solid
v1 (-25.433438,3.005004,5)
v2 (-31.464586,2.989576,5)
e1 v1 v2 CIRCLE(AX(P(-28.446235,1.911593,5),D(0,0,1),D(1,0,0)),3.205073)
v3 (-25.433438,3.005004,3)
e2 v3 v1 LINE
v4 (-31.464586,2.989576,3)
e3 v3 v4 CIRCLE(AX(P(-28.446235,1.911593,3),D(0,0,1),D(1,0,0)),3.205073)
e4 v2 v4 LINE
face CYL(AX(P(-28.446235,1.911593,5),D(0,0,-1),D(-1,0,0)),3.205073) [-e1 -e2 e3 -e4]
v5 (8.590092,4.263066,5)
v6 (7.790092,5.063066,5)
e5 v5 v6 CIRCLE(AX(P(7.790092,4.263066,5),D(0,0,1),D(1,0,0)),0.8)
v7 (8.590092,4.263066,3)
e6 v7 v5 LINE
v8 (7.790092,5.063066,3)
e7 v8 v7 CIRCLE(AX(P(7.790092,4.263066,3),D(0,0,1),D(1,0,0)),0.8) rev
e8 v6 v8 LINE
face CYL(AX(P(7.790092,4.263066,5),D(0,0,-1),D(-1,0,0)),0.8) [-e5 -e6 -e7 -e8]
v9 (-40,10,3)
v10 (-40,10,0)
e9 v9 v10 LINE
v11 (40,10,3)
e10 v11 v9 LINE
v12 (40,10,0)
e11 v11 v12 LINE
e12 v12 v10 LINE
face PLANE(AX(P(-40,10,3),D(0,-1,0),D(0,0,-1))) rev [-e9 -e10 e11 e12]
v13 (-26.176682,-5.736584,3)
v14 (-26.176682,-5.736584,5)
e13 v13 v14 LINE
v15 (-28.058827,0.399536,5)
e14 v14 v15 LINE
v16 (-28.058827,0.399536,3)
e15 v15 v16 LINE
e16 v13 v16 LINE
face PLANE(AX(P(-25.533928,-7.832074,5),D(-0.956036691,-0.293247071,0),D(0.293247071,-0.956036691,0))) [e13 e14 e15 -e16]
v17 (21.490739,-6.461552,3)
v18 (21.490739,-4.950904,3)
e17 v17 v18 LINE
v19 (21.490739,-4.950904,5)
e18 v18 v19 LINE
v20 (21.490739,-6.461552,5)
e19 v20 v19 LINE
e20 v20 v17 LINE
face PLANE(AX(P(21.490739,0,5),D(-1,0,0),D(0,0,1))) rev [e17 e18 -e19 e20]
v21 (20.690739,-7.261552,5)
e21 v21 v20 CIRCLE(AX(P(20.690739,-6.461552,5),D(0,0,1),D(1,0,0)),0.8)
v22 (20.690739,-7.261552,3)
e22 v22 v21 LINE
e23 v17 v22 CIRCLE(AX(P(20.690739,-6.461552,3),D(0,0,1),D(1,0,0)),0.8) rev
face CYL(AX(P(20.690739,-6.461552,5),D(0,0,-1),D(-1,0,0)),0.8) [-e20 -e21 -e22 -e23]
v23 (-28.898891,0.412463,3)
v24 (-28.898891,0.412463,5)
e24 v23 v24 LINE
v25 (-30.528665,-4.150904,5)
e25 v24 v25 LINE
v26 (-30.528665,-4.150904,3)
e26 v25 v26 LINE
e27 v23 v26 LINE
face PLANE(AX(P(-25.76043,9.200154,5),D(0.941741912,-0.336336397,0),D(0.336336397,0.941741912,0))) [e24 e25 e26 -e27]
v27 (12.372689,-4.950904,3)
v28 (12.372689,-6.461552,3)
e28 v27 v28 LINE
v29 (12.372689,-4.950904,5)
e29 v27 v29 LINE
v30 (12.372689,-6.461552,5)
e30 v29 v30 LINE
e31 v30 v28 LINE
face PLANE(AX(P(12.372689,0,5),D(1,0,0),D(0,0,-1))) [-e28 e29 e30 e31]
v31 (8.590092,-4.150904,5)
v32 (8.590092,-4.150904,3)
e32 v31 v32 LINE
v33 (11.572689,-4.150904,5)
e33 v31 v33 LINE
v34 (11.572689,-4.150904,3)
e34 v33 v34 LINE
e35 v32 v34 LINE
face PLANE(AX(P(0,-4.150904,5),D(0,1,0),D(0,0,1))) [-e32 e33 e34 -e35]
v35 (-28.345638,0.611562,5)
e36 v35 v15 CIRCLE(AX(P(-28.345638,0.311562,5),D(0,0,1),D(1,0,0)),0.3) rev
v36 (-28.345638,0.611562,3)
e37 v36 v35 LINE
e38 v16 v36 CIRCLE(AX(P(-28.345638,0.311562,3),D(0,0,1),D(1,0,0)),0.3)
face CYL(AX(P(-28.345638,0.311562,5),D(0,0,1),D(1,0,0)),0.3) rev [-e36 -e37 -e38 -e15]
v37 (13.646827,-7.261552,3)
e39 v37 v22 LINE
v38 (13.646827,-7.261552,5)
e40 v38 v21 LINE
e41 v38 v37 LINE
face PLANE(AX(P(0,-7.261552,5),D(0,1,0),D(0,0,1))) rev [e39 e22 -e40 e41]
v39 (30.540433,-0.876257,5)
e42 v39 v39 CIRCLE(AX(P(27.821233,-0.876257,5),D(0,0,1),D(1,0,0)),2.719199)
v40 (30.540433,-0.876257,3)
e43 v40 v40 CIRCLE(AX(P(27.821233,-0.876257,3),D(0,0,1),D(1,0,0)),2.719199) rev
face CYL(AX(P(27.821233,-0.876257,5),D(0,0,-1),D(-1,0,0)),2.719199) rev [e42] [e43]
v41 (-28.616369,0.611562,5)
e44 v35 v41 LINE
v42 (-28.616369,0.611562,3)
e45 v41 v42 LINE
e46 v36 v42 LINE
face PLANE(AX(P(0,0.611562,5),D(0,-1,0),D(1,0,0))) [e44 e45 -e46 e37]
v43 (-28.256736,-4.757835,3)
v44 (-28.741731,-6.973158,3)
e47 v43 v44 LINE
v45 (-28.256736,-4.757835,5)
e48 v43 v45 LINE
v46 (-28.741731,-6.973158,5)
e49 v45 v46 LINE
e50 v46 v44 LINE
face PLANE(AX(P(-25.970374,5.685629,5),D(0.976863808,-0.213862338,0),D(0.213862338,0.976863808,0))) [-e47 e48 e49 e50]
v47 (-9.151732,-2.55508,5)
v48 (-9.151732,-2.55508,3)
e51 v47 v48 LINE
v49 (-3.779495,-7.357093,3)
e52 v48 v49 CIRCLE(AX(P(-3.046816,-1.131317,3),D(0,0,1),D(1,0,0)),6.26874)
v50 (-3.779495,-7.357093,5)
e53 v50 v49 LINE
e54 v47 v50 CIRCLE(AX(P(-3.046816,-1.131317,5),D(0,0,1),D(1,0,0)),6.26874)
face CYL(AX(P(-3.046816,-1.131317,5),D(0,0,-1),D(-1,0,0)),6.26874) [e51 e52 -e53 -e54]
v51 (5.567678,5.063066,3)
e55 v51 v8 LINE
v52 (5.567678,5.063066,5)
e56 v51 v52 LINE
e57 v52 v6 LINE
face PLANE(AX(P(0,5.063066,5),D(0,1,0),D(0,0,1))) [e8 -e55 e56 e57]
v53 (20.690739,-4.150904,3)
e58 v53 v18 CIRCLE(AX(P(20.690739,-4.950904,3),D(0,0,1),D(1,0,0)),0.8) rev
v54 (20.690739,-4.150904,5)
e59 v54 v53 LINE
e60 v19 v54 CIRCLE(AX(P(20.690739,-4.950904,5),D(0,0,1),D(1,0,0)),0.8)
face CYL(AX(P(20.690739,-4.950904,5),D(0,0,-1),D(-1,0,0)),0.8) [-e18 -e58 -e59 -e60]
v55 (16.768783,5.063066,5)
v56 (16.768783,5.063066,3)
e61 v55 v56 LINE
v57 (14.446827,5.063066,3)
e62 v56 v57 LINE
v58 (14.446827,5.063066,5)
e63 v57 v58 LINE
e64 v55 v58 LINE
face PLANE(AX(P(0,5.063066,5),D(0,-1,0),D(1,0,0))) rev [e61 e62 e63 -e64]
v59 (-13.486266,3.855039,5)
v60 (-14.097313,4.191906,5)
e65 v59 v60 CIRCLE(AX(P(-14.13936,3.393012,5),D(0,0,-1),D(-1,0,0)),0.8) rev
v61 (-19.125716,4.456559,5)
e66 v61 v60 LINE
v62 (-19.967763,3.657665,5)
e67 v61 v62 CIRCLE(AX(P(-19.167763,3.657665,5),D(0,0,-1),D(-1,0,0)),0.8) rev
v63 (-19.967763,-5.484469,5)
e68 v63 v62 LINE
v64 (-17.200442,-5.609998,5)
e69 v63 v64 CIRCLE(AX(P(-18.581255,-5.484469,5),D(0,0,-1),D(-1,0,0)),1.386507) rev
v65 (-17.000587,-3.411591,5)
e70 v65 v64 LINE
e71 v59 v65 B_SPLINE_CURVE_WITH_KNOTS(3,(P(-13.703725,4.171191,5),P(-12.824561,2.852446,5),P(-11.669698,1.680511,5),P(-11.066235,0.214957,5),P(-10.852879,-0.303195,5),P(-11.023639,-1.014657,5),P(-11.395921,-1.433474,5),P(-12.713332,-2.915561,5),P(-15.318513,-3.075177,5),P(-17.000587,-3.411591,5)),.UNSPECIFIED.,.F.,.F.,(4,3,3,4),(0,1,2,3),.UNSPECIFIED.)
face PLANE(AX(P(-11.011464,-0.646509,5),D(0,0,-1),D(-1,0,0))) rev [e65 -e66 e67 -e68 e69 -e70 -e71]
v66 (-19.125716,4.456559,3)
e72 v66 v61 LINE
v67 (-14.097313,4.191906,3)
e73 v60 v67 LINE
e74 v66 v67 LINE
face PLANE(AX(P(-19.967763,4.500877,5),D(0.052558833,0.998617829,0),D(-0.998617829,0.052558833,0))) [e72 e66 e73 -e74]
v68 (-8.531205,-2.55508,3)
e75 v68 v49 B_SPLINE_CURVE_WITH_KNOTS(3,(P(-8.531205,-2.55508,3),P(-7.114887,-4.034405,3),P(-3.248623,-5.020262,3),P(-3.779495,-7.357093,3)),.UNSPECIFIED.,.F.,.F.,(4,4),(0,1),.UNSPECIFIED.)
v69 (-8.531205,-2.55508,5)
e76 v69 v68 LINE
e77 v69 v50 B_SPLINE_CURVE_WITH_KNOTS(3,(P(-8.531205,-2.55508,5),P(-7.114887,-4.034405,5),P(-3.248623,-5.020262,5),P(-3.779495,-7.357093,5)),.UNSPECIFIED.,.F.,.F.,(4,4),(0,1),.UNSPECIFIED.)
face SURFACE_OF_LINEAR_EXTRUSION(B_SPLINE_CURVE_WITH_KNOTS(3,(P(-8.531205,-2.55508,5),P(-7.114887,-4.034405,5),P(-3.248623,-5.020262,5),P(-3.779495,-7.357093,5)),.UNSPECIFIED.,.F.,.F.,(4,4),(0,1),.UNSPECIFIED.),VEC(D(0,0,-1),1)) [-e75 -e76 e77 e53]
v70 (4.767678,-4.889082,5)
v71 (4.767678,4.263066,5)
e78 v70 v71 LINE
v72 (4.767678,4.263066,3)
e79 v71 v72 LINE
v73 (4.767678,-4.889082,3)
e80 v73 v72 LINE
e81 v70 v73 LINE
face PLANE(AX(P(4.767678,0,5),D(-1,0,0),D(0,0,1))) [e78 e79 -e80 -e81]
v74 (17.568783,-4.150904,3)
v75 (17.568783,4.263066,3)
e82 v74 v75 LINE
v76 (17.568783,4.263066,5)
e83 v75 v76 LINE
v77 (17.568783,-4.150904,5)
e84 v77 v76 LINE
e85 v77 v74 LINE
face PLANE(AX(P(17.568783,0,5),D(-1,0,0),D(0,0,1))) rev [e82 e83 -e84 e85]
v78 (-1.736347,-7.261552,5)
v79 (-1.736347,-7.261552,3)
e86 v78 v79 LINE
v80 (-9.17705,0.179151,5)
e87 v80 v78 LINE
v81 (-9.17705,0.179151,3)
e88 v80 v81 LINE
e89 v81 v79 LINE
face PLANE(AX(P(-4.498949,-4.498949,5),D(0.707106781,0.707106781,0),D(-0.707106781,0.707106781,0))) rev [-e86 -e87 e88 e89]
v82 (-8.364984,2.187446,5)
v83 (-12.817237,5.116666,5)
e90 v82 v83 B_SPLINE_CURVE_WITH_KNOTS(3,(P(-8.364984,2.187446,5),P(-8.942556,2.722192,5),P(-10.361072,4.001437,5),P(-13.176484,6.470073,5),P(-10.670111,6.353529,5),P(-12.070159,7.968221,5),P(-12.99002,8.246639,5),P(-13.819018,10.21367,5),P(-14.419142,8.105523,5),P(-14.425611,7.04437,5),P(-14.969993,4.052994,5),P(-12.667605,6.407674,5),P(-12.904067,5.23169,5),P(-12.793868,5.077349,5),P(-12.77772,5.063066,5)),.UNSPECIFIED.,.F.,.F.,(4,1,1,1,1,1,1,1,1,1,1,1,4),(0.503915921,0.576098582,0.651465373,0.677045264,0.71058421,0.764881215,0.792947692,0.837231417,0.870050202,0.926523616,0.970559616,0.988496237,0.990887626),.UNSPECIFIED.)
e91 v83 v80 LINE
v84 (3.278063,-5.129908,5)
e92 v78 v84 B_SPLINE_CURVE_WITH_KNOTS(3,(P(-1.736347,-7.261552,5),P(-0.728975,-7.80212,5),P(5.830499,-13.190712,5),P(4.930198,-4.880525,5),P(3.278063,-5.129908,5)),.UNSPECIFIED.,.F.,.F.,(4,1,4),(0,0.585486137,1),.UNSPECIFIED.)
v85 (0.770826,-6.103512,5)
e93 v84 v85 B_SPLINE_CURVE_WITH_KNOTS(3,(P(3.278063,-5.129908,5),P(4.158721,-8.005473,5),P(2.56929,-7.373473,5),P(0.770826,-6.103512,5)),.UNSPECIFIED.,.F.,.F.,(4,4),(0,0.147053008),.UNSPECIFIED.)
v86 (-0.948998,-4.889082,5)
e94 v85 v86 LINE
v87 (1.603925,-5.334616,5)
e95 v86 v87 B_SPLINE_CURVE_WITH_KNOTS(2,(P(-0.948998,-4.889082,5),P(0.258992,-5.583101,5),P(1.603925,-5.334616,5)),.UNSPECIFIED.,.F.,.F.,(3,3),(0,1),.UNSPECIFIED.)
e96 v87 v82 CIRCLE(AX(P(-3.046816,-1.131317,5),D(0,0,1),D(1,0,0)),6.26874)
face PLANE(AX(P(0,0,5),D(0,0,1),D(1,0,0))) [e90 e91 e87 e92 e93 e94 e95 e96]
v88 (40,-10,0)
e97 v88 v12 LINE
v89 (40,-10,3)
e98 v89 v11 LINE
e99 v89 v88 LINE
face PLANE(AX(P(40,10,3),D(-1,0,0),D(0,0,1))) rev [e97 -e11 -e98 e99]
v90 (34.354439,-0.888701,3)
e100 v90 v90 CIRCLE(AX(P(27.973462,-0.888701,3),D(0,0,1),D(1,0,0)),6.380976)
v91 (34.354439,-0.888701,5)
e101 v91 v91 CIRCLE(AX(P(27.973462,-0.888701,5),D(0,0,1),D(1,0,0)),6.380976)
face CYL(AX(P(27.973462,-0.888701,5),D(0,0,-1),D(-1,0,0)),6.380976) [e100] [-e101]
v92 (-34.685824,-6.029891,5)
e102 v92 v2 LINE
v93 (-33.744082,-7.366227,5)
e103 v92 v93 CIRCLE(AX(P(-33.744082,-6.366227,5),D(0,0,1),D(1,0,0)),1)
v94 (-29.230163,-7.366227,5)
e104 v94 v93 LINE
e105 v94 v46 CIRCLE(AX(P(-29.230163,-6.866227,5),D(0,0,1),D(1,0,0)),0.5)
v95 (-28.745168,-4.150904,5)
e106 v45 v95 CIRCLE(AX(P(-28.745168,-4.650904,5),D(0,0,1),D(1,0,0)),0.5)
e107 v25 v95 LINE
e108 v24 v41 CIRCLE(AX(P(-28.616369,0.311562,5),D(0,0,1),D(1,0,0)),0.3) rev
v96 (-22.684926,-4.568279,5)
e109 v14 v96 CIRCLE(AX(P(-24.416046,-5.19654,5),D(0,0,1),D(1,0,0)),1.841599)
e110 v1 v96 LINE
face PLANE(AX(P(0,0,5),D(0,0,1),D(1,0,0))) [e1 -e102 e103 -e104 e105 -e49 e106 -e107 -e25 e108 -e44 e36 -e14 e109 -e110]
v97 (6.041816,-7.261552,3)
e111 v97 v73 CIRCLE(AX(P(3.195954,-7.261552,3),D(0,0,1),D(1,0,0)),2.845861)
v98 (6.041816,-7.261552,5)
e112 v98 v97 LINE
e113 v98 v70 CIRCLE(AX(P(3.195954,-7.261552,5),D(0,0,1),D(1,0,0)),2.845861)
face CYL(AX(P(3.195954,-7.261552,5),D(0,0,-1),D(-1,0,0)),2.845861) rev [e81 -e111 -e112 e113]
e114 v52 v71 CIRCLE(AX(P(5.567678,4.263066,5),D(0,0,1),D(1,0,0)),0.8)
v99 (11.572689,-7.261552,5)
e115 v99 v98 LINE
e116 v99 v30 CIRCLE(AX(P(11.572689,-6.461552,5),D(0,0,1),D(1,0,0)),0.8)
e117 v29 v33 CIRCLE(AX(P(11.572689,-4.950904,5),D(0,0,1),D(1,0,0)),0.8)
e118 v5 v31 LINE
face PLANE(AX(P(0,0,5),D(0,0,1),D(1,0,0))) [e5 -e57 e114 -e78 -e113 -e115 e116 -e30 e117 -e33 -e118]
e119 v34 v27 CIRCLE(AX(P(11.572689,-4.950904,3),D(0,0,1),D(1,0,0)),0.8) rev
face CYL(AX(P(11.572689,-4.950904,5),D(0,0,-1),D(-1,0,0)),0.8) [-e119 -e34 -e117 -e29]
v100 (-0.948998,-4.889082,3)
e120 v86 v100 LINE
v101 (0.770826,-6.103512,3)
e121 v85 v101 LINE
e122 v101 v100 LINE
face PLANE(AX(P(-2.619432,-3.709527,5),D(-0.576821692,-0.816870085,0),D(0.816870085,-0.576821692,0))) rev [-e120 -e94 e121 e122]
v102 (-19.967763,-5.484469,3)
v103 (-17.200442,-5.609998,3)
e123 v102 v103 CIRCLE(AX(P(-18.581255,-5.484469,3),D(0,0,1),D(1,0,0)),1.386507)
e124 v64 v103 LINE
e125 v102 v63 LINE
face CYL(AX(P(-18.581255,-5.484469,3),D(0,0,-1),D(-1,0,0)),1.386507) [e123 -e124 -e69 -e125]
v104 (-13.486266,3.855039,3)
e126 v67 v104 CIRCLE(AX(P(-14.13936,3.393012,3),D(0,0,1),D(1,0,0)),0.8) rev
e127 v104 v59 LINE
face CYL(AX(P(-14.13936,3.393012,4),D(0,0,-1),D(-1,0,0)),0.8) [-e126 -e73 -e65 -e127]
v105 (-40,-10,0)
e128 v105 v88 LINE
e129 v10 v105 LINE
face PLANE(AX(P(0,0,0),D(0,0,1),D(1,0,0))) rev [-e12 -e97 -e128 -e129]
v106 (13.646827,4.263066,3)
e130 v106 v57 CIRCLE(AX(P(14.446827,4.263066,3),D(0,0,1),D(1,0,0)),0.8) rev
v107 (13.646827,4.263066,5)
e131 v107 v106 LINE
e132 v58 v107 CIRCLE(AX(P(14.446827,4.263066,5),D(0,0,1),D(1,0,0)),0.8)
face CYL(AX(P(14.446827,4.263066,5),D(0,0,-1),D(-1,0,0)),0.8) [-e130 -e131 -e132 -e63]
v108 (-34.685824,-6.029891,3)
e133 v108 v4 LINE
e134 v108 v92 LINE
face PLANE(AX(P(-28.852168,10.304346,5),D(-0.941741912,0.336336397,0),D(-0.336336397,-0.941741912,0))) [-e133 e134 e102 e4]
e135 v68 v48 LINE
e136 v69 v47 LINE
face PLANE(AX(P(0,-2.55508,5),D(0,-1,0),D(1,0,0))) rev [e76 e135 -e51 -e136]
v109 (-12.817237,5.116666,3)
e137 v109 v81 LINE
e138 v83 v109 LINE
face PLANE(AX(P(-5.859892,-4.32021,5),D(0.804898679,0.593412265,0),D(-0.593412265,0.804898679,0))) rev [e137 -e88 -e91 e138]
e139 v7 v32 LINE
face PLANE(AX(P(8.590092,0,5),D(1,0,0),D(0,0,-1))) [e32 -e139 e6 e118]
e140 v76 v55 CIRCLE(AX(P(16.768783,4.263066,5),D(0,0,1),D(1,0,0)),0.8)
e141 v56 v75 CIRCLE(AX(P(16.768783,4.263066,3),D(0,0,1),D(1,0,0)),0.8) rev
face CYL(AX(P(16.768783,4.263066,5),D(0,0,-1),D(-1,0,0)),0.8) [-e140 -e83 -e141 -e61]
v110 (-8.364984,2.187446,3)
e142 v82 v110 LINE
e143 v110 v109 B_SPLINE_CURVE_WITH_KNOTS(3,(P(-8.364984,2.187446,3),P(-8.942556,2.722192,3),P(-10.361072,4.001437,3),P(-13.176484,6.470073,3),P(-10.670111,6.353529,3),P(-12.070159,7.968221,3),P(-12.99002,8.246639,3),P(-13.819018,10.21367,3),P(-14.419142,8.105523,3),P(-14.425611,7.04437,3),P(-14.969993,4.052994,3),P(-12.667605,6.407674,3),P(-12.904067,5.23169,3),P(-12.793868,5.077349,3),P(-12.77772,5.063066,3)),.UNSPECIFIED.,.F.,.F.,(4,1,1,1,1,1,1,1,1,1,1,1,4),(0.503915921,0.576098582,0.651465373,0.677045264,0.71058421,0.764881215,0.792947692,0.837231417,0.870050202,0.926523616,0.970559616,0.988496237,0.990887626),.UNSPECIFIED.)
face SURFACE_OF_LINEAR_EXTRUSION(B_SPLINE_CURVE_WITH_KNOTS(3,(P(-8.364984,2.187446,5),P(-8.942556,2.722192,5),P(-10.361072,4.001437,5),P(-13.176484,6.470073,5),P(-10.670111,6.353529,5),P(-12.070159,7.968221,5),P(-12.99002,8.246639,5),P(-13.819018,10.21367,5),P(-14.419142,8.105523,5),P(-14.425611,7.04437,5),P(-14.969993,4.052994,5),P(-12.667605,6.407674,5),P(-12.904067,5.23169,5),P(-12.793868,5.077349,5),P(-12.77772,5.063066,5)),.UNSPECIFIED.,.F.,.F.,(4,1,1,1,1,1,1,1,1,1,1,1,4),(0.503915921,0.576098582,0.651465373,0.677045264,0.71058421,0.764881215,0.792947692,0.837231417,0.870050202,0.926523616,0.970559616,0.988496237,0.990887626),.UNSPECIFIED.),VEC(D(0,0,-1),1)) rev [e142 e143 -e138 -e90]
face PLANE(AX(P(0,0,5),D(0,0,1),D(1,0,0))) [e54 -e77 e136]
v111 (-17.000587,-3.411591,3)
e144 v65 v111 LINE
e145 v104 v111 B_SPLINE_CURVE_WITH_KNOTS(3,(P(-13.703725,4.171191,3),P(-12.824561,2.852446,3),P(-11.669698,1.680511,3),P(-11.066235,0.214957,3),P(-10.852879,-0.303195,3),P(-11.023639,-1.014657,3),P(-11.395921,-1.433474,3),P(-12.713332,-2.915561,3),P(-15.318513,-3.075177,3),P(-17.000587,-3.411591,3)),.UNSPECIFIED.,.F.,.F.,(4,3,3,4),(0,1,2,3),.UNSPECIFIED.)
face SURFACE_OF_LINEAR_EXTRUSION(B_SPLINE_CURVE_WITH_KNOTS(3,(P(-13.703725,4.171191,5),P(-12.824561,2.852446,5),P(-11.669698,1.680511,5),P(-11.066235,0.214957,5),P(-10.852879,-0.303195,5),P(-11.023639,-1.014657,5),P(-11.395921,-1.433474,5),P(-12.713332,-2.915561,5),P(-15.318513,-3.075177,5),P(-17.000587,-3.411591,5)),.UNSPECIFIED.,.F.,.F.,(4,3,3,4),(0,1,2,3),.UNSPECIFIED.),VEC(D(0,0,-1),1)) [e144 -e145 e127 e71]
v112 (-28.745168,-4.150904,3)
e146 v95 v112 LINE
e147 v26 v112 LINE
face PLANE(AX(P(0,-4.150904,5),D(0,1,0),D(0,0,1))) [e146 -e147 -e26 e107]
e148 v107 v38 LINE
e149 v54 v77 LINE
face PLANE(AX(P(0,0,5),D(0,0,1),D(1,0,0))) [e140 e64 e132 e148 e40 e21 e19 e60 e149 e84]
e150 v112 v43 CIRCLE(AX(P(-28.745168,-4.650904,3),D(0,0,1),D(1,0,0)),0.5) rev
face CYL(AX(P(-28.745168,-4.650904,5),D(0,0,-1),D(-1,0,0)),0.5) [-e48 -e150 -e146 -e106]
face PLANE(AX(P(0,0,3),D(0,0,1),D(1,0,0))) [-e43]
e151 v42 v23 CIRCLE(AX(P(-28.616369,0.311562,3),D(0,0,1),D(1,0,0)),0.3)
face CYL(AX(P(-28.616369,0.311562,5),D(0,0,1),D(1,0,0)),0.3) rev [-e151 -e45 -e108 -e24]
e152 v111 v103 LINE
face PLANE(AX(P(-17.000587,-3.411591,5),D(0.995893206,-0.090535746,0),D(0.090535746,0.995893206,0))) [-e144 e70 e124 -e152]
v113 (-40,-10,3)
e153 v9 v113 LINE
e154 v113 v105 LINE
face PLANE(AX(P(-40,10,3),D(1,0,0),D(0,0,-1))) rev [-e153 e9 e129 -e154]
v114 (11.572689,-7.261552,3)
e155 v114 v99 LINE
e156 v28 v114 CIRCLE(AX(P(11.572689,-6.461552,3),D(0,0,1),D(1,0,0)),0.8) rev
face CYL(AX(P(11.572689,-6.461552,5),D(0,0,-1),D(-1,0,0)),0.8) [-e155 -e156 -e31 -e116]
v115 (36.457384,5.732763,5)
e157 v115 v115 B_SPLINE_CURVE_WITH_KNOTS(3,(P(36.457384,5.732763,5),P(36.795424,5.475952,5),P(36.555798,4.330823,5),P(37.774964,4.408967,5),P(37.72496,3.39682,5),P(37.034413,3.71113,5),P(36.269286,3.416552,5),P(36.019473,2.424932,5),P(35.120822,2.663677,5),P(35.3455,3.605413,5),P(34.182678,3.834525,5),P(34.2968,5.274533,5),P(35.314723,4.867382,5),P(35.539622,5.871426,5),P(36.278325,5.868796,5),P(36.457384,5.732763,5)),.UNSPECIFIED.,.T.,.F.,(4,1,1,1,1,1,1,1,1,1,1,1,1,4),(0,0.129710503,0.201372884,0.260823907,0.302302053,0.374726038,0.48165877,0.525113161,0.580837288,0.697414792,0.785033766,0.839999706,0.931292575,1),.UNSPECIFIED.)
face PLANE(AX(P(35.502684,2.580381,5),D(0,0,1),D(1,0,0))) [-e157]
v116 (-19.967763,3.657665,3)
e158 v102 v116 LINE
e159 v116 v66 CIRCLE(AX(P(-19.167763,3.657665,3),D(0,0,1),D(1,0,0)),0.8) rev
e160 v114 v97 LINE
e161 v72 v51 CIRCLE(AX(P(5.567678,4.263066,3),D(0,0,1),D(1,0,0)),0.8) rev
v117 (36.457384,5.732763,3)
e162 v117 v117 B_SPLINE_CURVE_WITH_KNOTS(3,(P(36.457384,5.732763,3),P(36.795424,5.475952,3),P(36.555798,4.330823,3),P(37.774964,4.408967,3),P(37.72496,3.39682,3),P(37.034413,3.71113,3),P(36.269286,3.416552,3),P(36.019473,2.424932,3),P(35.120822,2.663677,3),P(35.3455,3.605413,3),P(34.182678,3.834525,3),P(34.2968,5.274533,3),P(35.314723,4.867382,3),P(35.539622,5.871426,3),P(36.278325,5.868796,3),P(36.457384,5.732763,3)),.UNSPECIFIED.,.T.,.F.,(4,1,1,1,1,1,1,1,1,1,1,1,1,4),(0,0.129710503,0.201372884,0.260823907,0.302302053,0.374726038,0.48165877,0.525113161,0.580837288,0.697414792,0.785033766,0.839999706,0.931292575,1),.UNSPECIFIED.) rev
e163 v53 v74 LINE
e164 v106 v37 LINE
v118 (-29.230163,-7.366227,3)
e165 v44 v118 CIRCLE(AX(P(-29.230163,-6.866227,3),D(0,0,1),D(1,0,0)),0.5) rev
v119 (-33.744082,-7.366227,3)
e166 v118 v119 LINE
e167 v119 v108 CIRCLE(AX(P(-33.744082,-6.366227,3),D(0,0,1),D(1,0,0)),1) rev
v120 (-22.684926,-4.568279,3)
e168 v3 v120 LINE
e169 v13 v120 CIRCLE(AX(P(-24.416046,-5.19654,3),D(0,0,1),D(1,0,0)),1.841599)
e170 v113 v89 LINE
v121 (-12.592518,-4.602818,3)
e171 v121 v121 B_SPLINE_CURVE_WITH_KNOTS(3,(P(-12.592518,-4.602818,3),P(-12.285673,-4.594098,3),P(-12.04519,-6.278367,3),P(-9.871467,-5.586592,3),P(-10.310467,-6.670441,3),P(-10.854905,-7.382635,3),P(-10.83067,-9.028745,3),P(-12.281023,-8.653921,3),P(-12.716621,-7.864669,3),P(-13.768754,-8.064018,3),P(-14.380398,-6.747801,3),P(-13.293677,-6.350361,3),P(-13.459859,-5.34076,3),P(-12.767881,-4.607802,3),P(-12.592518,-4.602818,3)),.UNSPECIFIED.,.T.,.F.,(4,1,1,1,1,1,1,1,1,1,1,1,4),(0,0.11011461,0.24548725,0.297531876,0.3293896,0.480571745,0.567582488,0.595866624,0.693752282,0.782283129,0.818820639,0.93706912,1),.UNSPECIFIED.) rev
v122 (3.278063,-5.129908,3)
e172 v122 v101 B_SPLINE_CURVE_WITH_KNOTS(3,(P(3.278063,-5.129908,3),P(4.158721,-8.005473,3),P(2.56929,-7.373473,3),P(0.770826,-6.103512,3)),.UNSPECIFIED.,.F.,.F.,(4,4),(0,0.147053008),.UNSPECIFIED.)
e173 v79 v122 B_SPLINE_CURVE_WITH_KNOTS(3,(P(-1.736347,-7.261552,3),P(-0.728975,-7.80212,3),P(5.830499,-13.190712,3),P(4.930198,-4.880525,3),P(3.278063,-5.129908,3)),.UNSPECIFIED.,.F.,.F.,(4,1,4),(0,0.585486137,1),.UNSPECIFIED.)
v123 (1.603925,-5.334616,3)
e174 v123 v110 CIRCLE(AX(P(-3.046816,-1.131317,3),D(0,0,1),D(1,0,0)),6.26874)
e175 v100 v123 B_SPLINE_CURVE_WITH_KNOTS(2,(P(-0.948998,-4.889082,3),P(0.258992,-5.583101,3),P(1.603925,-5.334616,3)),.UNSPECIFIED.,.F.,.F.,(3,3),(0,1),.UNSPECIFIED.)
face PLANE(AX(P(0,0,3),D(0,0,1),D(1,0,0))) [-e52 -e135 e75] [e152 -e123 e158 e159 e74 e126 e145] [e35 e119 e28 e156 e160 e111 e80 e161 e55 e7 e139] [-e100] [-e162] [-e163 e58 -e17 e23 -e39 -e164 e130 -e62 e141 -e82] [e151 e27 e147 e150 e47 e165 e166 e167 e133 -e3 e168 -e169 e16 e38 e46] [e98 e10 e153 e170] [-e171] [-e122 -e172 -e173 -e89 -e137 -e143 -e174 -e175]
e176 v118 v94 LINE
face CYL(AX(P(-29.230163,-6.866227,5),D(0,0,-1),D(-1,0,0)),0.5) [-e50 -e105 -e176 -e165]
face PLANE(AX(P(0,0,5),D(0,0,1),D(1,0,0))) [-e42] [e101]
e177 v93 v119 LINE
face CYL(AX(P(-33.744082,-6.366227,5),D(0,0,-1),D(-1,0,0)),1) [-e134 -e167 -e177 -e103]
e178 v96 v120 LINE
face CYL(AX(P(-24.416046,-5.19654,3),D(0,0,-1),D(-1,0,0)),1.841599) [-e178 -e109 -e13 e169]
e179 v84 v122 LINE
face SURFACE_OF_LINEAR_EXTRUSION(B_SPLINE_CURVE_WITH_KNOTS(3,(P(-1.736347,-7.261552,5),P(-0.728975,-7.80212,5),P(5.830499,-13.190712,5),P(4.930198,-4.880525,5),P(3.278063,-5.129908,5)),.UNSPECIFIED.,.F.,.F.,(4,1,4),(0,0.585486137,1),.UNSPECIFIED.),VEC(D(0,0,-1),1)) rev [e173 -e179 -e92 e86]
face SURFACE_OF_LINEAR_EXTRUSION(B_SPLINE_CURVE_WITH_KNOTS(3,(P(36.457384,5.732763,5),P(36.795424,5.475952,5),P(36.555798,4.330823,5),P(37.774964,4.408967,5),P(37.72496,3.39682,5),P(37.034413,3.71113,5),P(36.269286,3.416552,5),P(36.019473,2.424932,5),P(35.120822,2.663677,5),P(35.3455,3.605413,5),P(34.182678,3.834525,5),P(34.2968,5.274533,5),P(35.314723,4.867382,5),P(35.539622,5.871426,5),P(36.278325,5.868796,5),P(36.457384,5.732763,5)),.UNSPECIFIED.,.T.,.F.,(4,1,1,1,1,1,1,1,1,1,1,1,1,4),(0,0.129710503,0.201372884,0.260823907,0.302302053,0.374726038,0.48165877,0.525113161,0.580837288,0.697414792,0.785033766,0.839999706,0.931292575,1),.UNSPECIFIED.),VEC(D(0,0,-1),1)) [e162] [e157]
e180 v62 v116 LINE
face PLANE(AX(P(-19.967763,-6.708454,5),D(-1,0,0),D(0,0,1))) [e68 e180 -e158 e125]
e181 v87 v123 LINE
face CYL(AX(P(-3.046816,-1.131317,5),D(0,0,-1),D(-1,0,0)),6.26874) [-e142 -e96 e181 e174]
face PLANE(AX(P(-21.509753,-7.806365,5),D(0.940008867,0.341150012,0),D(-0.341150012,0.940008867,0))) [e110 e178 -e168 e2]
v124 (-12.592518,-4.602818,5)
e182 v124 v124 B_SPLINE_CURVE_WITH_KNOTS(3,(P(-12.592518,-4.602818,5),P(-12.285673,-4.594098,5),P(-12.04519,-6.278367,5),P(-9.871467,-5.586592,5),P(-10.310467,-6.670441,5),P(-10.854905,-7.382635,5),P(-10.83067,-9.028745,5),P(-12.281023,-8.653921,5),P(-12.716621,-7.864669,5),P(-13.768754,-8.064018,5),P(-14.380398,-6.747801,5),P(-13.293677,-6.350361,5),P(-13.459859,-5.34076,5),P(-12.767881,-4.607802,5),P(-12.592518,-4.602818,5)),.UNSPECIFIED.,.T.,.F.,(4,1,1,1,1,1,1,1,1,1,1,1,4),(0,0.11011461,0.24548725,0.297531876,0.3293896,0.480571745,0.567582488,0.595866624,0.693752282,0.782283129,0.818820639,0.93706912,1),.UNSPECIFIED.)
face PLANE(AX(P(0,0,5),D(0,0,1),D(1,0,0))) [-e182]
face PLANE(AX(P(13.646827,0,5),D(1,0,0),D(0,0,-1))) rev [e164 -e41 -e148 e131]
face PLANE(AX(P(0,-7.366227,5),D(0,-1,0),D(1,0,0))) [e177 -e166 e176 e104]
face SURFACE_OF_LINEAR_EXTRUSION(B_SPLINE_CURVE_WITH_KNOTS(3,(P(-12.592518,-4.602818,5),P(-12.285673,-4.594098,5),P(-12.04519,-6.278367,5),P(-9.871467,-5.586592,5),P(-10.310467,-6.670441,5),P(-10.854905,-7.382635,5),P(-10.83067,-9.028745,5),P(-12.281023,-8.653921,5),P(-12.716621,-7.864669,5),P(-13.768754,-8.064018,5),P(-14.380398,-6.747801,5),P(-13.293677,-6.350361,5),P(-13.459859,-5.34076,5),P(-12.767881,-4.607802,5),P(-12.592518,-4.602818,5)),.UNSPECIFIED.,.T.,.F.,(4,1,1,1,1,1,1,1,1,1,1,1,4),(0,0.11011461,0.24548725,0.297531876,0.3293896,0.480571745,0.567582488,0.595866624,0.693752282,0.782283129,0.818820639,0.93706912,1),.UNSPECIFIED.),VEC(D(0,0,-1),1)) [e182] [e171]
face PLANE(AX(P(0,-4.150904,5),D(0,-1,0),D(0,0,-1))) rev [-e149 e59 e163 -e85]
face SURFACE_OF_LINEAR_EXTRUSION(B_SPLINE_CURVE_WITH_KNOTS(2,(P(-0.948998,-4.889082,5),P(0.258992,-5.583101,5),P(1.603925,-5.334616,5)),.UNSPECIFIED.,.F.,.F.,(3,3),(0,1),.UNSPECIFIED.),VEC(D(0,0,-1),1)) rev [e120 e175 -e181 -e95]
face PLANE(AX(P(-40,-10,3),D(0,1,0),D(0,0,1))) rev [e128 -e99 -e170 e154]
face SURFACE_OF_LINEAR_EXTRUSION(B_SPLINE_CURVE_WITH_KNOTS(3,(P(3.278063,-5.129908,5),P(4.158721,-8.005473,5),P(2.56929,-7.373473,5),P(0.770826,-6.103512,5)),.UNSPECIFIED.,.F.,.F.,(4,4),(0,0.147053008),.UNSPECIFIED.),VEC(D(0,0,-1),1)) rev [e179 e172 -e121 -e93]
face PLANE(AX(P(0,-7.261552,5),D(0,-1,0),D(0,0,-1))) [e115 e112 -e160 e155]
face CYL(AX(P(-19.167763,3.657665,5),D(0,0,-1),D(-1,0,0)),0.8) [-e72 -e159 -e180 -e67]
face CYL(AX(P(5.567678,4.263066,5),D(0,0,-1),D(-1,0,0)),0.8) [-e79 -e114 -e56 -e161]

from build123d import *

# Parameters (mm, degrees)
SKETCH1_W           = 80
SKETCH1_H           = 20
BOSS_EXTRUDE1_DEPTH = 3
SKETCH2_R           = 6.380976216
SKETCH2_R_2         = 2.719199248
BOSS_EXTRUDE2_DEPTH = 2
FILLET2_R           = 3.205073
FILLET3_R           = 1
FILLET4_R           = 0.5
FILLET5_R           = 0.3
FILLET6_R           = 1.841599
FILLET7_R           = 1.386507
FILLET8_R           = 0.8
FILLET9_R           = 0.8


with BuildPart() as part:
    # Sketch1 → Boss-Extrude1 (new body)
    with BuildSketch(Plane.XY):
        Rectangle(SKETCH1_W, SKETCH1_H)
    extrude(amount=BOSS_EXTRUDE1_DEPTH)

    # Sketch2 → Boss-Extrude2 (add)
    # profile 1 of 9: a face of its own
    with BuildSketch(Plane.XY.offset(3)):
        Polygon((-28.12386187, -4.1509041), (-28.827784411, -7.366226909), (-35.163087278, -7.366226909), (-30.704911186, 5.116666146), (-26.199806926, 5.116666146), (-21.788559004, -7.03813971), (-25.777453401, -7.03813971), (-28.12386187, 0.611561886), (-28.827784411, 0.611561886), (-30.52866512, -4.1509041), align=None)
    # profile 2 of 9: a face of its own
    with BuildSketch(Plane.XY.offset(3)):
        with BuildLine():
            add(Edge.make_bspline(
                [(-12.59251829, -4.602818179), (-12.285673118, -4.594098223), (-12.045189517, -6.278366622), (-9.871466908, -5.586592295), (-10.310467369, -6.670441484), (-10.854905139, -7.382635244), (-10.830670227, -9.028744868), (-12.281022713, -8.653920913), (-12.716621389, -7.864668819), (-13.768754433, -8.064018209), (-14.380398238, -6.747801361), (-13.293676747, -6.35036102), (-13.459858592, -5.340760333), (-12.767881366, -4.607801664), (-12.59251829, -4.602818179)],
                knots=[0, 0, 0, 0, 0.11011461, 0.24548725, 0.297531876, 0.3293896, 0.480571745, 0.567582488, 0.595866624, 0.693752282, 0.782283129, 0.818820639, 0.93706912, 1, 1, 1, 1], degree=3))
        make_face()
    # profile 3 of 9: a face of its own
    with BuildSketch(Plane.XY.offset(3)):
        with BuildLine():
            add(Edge.make_bspline(
                [(-8.364983843, 2.187446392), (-8.942555715, 2.722192331), (-10.361072154, 4.001436937), (-13.176484219, 6.470073101), (-10.670110511, 6.353529328), (-12.070158555, 7.96822111), (-12.990019942, 8.246638508), (-13.819017978, 10.213670234), (-14.41914197, 8.105522509), (-14.425611396, 7.044369894), (-14.969993178, 4.05299408), (-12.667604996, 6.407674494), (-12.895281858, 5.275383081), (-12.817237262, 5.116666146)],
                knots=[0.503915921, 0.503915921, 0.503915921, 0.503915921, 0.576098582, 0.651465373, 0.677045264, 0.71058421, 0.764881215, 0.792947692, 0.837231417, 0.870050202, 0.926523616, 0.970559616, 0.988496237, 0.988496237, 0.988496237, 0.988496237], degree=3))
            Line((-12.817237262, 5.116666146), (-12.777720238, 5.063065635))
            Line((-12.777720238, 5.063065635), (-9.177050203, 0.179151487))
            Line((-9.177050203, 0.179151487), (-1.736347016, -7.261551699))
            add(Edge.make_bspline(
                [(-1.736347016, -7.261551699), (-0.728975006, -7.80212022), (5.830498878, -13.19071187), (4.93019751, -4.880525107), (3.278062555, -5.129908048)],
                knots=[0, 0, 0, 0, 0.585486137, 1, 1, 1, 1], degree=3))
            add(Edge.make_bspline(
                [(3.278062555, -5.129908048), (4.158720522, -8.005473341), (2.569289754, -7.373472742), (0.770825638, -6.103511786)],
                knots=[0, 0, 0, 0, 0.147053008, 0.147053008, 0.147053008, 0.147053008], degree=3))
            Line((0.770825638, -6.103511786), (-0.948997568, -4.889082039))
            add(Edge.make_bspline(
                [(-0.948997568, -4.889082039), (0.258992445, -5.583100773), (1.603924753, -5.334615685)],
                knots=[0, 0, 0, 1, 1, 1], degree=2))
            ThreePointArc((1.603924753, -5.334615685), (0.728991597, 3.872719866), (-8.364983843, 2.187446392))
        make_face()
    # profile 4 of 9: a face of its own
    with BuildSketch(Plane.XY.offset(3)):
        with BuildLine():
            Line((-8.531204956, -2.555079698), (-9.151731972, -2.555079698))
            ThreePointArc((-9.151731972, -2.555079698), (-7.224495952, -5.805083304), (-3.779495461, -7.357092883))
            add(Edge.make_bspline(
                [(-8.531204956, -2.555079698), (-7.114887373, -4.034404827), (-3.248622845, -5.020262143), (-3.779495461, -7.357092883)],
                knots=[0, 0, 0, 0, 1, 1, 1, 1], degree=3))
        make_face()
    # profile 5 of 9: a face of its own
    with BuildSketch(Plane.XY.offset(3)):
        with BuildLine():
            ThreePointArc((6.041815598, -7.261551699), (5.703127314, -5.915071109), (4.767677603, -4.889082039))
            Line((4.767677603, -4.889082039), (4.767677603, 5.063065635))
            Line((4.767677603, 5.063065635), (8.59009159, 5.063065635))
            Line((8.59009159, 5.063065635), (8.59009159, -4.1509041))
            Line((8.59009159, -4.1509041), (12.372688764, -4.1509041))
            Line((12.372688764, -4.1509041), (12.372688764, -7.261551699))
            Line((12.372688764, -7.261551699), (6.041815598, -7.261551699))
        make_face()
    # profile 6 of 9: a face of its own
    with BuildSketch(Plane.XY.offset(3)):
        Polygon((17.568782778, -4.1509041), (17.568782778, 5.063065635), (13.64682676, 5.063065635), (13.64682676, -7.261551699), (21.490738796, -7.261551699), (21.490738796, -4.1509041), align=None)
    # profile 7 of 9: a face of its own
    with BuildSketch(Plane.XY.offset(3)):
        with Locations((27.973462337, -0.888700555)):
            Circle(SKETCH2_R)
        with Locations((27.821233276, -0.876256564)):
            Circle(SKETCH2_R_2, mode=Mode.SUBTRACT)
    # profile 8 of 9: a face of its own
    with BuildSketch(Plane.XY.offset(3)):
        with BuildLine():
            Line((-17.000586742, -3.411591454), (-17.330272947, -7.03813971))
            Line((-17.330272947, -7.03813971), (-19.967762587, -6.708453505))
            Line((-19.967762587, -6.708453505), (-19.967762587, 4.500877466))
            Line((-19.967762587, 4.500877466), (-13.703724691, 4.171191261))
            add(Edge.make_bspline(
                [(-13.703724691, 4.171191261), (-12.824561478, 2.852446441), (-11.669698372, 1.680510579), (-11.066235051, 0.214956801), (-10.852878548, -0.303194706), (-11.023639134, -1.014656837), (-11.395921256, -1.433474224), (-12.71333174, -2.915561019), (-15.318512758, -3.075176657), (-17.000586742, -3.411591454)],
                knots=[0, 0, 0, 0, 1, 1, 1, 2, 2, 2, 3, 3, 3, 3], degree=3))
        make_face()
    # profile 9 of 9: a face of its own
    with BuildSketch(Plane.XY.offset(3)):
        with BuildLine():
            add(Edge.make_bspline(
                [(36.457383917, 5.732763434), (36.795423659, 5.475951838), (36.55579759, 4.330823098), (37.774964362, 4.408966936), (37.724960467, 3.396819601), (37.0344127, 3.711130005), (36.269286065, 3.416552073), (36.019473408, 2.424932444), (35.120821531, 2.663677009), (35.345500165, 3.60541314), (34.182677931, 3.834525293), (34.296799972, 5.274533429), (35.314723498, 4.867381557), (35.539622469, 5.871425979), (36.278324862, 5.868796084), (36.457383917, 5.732763434)],
                knots=[0, 0, 0, 0, 0.129710503, 0.201372884, 0.260823907, 0.302302053, 0.374726038, 0.48165877, 0.525113161, 0.580837288, 0.697414792, 0.785033766, 0.839999706, 0.931292575, 1, 1, 1, 1], degree=3))
        make_face()
    extrude(amount=BOSS_EXTRUDE2_DEPTH)

    # Fillet2
    fillet2_edges = [part.edges().sort_by_distance(p)[0] for p in [
        (-26.199806926, 5.116666146, 4),
        (-30.704911186, 5.116666146, 4),
    ]]
    fillet(fillet2_edges, radius=FILLET2_R - 0.0001)  # a hair under: the kernel refuses the full size

    # Fillet3
    fillet3_edges = [part.edges().sort_by_distance(p)[0] for p in [
        (-35.163087278, -7.366226909, 4),
    ]]
    fillet(fillet3_edges, radius=FILLET3_R)

    # Fillet4
    fillet4_edges = [part.edges().sort_by_distance(p)[0] for p in [
        (-28.827784411, -7.366226909, 4),
        (-28.12386187, -4.1509041, 4),
    ]]
    fillet(fillet4_edges, radius=FILLET4_R)

    # Fillet5
    fillet5_edges = [part.edges().sort_by_distance(p)[0] for p in [
        (-28.827784411, 0.611561886, 4),
        (-28.12386187, 0.611561886, 4),
    ]]
    fillet(fillet5_edges, radius=FILLET5_R)

    # Fillet6
    fillet6_edges = [part.edges().sort_by_distance(p)[0] for p in [
        (-25.777453401, -7.03813971, 4),
        (-21.788559004, -7.03813971, 4),
    ]]
    fillet(fillet6_edges, radius=FILLET6_R)

    # Fillet7
    fillet7_edges = [part.edges().sort_by_distance(p)[0] for p in [
        (-19.967762587, -6.708453505, 4),
        (-17.330272947, -7.03813971, 4),
    ]]
    fillet(fillet7_edges, radius=FILLET7_R)

    # Fillet8
    fillet8_edges = [part.edges().sort_by_distance(p)[0] for p in [
        (-19.967762587, 4.500877466, 4),
        (-13.703724691, 4.171191261, 4),
    ]]
    fillet(fillet8_edges, radius=FILLET8_R)

    # Fillet9
    fillet9_edges = [part.edges().sort_by_distance(p)[0] for p in [
        (12.372688764, -7.261551699, 4),
        (12.372688764, -4.1509041, 4),
        (8.59009159, 5.063065635, 4),
        (4.767677603, 5.063065635, 4),
        (17.568782778, 5.063065635, 4),
        (13.64682676, 5.063065635, 4),
        (21.490738796, -7.261551699, 4),
        (21.490738796, -4.1509041, 4),
    ]]
    fillet(fillet9_edges, radius=FILLET9_R)


solid = part.part
